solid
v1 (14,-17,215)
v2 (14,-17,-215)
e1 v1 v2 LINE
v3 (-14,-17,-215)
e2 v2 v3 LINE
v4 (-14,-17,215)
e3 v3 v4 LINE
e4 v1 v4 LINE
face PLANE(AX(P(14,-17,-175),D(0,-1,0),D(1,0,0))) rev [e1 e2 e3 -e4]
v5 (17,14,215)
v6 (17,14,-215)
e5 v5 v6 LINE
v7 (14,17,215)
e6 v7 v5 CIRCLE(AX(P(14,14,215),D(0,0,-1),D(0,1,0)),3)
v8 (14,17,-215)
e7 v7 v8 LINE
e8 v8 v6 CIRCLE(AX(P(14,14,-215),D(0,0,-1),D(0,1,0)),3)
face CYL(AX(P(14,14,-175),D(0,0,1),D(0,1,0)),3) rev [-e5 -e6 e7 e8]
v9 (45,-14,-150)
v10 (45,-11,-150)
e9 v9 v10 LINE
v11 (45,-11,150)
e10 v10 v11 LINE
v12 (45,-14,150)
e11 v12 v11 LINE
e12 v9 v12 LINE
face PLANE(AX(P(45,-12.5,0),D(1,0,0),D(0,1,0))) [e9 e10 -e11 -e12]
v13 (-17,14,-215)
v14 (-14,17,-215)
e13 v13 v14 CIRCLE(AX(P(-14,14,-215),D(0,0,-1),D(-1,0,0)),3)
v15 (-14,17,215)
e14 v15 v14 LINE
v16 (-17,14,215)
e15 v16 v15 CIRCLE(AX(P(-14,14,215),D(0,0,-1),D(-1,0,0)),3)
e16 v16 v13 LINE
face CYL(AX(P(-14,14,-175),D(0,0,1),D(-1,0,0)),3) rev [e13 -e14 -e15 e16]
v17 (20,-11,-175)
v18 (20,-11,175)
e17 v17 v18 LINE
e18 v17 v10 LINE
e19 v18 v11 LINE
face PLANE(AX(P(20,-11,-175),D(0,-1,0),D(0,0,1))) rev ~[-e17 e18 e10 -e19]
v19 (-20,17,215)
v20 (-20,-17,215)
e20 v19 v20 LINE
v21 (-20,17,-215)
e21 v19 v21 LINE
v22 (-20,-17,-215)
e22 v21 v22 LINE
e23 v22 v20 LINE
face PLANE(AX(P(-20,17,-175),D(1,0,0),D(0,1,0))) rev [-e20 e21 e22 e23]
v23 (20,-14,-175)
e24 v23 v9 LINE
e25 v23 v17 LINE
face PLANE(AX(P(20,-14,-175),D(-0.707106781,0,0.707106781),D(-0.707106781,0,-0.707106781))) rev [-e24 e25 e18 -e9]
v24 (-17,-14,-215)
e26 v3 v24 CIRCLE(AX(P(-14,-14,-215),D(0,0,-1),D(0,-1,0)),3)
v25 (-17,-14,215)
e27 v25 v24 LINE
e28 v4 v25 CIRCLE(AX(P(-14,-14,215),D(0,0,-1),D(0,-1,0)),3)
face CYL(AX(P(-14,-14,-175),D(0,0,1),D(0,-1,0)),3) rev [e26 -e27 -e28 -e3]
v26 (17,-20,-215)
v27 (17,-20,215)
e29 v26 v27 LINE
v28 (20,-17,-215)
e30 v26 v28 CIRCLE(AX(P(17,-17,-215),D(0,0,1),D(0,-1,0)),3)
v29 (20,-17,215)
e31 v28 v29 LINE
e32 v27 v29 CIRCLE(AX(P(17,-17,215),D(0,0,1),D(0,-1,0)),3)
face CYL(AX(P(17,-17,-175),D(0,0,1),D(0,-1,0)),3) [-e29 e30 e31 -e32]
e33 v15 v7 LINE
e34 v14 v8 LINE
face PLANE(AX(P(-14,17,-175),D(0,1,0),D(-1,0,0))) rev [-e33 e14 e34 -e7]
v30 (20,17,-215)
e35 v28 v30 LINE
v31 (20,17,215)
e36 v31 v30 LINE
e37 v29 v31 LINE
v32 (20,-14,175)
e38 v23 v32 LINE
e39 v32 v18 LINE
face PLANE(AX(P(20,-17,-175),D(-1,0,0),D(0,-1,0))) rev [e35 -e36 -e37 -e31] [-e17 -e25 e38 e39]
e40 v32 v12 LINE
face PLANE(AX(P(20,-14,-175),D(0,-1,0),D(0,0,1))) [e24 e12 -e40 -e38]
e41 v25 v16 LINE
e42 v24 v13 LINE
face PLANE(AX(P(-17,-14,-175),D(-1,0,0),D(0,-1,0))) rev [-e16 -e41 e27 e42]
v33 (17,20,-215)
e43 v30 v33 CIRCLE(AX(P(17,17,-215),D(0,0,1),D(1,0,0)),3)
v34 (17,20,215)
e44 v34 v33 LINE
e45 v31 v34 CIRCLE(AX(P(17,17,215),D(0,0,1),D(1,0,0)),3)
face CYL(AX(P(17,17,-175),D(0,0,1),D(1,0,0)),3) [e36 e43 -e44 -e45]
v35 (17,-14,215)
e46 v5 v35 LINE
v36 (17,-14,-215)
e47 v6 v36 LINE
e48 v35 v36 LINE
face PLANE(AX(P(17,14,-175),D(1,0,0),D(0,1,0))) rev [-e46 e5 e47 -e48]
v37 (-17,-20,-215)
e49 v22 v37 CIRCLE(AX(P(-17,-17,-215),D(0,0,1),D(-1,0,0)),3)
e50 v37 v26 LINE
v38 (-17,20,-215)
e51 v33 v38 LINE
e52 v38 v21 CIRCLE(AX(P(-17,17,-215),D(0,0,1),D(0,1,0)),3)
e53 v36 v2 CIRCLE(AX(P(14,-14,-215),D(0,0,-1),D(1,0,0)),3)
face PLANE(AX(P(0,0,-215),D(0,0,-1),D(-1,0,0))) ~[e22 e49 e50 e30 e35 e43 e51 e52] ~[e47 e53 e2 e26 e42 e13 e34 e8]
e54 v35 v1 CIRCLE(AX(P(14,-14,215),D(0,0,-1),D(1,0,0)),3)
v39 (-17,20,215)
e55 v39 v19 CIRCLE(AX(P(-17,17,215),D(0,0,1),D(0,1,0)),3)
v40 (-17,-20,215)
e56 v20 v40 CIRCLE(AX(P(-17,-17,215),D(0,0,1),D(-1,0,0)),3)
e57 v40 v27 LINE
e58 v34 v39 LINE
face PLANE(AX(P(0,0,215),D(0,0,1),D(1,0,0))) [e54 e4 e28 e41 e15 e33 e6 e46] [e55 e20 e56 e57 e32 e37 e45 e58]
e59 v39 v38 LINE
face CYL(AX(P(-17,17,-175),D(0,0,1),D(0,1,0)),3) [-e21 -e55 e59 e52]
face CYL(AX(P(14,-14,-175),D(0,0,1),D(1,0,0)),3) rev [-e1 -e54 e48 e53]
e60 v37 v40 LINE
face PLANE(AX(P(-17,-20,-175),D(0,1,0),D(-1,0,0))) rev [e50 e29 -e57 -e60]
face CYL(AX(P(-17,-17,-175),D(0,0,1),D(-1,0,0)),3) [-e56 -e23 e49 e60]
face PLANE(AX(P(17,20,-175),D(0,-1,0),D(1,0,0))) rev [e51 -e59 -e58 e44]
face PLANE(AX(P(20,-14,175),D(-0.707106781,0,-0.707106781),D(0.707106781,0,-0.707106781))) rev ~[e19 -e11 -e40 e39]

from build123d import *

# Parameters (mm, degrees)
F1_DEPTH = 175
F2_W     = 3
F2_H     = 350
F3_DEPTH = 25
F5_DEPTH = 34.001
F7_DEPTH = 40


# Not quite as in the source:
# - a pattern or mirror of a feature is missing from the dataset's text; its kind, count and spacing are read off the source's solid


with BuildPart() as f1:
    # F0 (on Top) → F1 (new body, symmetric)
    with BuildSketch(Plane.XY):
        with BuildLine():
            ThreePointArc((20, 17), (19.1213203436, 19.1213203436), (17, 20))
            Line((17, 20), (-17, 20))
            ThreePointArc((-17, 20), (-19.1213203436, 19.1213203436), (-20, 17))
            Line((-20, 17), (-20, -17))
            ThreePointArc((-20, -17), (-19.1213203436, -19.1213203436), (-17, -20))
            Line((-17, -20), (17, -20))
            ThreePointArc((17, -20), (19.1213203436, -19.1213203436), (20, -17))
            Line((20, -17), (20, 17))
        make_face()
        with BuildLine():
            ThreePointArc((14, 17), (16.1213203436, 16.1213203436), (17, 14))
            Line((17, 14), (17, -14))
            ThreePointArc((17, -14), (16.1213203436, -16.1213203436), (14, -17))
            Line((14, -17), (-14, -17))
            ThreePointArc((-14, -17), (-16.1213203436, -16.1213203436), (-17, -14))
            Line((-17, -14), (-17, 14))
            ThreePointArc((-17, 14), (-16.1213203436, 16.1213203436), (-14, 17))
            Line((-14, 17), (14, 17))
        make_face(mode=Mode.SUBTRACT)
    extrude(amount=F1_DEPTH, both=True)

    # F2 (on face) → F3 (join)
    with BuildSketch(Plane.YZ.offset(20)):
        with Locations((-12.5, 0)):
            Rectangle(F2_W, F2_H)
    extrude(amount=F3_DEPTH)

    # F4 (on face) → F5 (cut, through all)
    with BuildSketch(Plane.XZ.offset(14)):
        Polygon((45, 175), (20, 175), (45, 150), align=None)
    f5 = extrude(amount=-F5_DEPTH, mode=Mode.SUBTRACT)

    # F5_copies: F5 across plane
    add(f5.mirror(Plane(origin=(0, 0, 0), x_dir=(-1, 0, 0), z_dir=(0, 0, -1))), mode=Mode.SUBTRACT)

    # F6 (on face) → F7 (join)
    with BuildSketch(Plane.XY.offset(175)):
        with BuildLine():
            Line((-20, 17), (-20, -17))
            ThreePointArc((-20, -17), (-19.1213203436, -19.1213203436), (-17, -20))
            Line((-17, -20), (17, -20))
            ThreePointArc((17, -20), (19.1213203436, -19.1213203436), (20, -17))
            Line((20, -17), (20, -14))
            Line((20, -14), (20, -11))
            Line((20, -11), (20, 17))
            ThreePointArc((20, 17), (19.1213203436, 19.1213203436), (17, 20))
            Line((17, 20), (-17, 20))
            ThreePointArc((-17, 20), (-19.1213203436, 19.1213203436), (-20, 17))
        make_face()
        with BuildLine():
            ThreePointArc((-14, -17), (-16.1213203436, -16.1213203436), (-17, -14))
            Line((-17, -14), (-17, 14))
            ThreePointArc((-17, 14), (-16.1213203436, 16.1213203436), (-14, 17))
            Line((-14, 17), (14, 17))
            ThreePointArc((14, 17), (16.1213203436, 16.1213203436), (17, 14))
            Line((17, 14), (17, -14))
            ThreePointArc((17, -14), (16.1213203436, -16.1213203436), (14, -17))
            Line((14, -17), (-14, -17))
        make_face(mode=Mode.SUBTRACT)
    f7 = extrude(amount=F7_DEPTH)

    # F7_copies: F7 across plane
    add(f7.mirror(Plane(origin=(0, 0, 0), x_dir=(-1, 0, 0), z_dir=(0, 0, -1))))


solid = f1.part
